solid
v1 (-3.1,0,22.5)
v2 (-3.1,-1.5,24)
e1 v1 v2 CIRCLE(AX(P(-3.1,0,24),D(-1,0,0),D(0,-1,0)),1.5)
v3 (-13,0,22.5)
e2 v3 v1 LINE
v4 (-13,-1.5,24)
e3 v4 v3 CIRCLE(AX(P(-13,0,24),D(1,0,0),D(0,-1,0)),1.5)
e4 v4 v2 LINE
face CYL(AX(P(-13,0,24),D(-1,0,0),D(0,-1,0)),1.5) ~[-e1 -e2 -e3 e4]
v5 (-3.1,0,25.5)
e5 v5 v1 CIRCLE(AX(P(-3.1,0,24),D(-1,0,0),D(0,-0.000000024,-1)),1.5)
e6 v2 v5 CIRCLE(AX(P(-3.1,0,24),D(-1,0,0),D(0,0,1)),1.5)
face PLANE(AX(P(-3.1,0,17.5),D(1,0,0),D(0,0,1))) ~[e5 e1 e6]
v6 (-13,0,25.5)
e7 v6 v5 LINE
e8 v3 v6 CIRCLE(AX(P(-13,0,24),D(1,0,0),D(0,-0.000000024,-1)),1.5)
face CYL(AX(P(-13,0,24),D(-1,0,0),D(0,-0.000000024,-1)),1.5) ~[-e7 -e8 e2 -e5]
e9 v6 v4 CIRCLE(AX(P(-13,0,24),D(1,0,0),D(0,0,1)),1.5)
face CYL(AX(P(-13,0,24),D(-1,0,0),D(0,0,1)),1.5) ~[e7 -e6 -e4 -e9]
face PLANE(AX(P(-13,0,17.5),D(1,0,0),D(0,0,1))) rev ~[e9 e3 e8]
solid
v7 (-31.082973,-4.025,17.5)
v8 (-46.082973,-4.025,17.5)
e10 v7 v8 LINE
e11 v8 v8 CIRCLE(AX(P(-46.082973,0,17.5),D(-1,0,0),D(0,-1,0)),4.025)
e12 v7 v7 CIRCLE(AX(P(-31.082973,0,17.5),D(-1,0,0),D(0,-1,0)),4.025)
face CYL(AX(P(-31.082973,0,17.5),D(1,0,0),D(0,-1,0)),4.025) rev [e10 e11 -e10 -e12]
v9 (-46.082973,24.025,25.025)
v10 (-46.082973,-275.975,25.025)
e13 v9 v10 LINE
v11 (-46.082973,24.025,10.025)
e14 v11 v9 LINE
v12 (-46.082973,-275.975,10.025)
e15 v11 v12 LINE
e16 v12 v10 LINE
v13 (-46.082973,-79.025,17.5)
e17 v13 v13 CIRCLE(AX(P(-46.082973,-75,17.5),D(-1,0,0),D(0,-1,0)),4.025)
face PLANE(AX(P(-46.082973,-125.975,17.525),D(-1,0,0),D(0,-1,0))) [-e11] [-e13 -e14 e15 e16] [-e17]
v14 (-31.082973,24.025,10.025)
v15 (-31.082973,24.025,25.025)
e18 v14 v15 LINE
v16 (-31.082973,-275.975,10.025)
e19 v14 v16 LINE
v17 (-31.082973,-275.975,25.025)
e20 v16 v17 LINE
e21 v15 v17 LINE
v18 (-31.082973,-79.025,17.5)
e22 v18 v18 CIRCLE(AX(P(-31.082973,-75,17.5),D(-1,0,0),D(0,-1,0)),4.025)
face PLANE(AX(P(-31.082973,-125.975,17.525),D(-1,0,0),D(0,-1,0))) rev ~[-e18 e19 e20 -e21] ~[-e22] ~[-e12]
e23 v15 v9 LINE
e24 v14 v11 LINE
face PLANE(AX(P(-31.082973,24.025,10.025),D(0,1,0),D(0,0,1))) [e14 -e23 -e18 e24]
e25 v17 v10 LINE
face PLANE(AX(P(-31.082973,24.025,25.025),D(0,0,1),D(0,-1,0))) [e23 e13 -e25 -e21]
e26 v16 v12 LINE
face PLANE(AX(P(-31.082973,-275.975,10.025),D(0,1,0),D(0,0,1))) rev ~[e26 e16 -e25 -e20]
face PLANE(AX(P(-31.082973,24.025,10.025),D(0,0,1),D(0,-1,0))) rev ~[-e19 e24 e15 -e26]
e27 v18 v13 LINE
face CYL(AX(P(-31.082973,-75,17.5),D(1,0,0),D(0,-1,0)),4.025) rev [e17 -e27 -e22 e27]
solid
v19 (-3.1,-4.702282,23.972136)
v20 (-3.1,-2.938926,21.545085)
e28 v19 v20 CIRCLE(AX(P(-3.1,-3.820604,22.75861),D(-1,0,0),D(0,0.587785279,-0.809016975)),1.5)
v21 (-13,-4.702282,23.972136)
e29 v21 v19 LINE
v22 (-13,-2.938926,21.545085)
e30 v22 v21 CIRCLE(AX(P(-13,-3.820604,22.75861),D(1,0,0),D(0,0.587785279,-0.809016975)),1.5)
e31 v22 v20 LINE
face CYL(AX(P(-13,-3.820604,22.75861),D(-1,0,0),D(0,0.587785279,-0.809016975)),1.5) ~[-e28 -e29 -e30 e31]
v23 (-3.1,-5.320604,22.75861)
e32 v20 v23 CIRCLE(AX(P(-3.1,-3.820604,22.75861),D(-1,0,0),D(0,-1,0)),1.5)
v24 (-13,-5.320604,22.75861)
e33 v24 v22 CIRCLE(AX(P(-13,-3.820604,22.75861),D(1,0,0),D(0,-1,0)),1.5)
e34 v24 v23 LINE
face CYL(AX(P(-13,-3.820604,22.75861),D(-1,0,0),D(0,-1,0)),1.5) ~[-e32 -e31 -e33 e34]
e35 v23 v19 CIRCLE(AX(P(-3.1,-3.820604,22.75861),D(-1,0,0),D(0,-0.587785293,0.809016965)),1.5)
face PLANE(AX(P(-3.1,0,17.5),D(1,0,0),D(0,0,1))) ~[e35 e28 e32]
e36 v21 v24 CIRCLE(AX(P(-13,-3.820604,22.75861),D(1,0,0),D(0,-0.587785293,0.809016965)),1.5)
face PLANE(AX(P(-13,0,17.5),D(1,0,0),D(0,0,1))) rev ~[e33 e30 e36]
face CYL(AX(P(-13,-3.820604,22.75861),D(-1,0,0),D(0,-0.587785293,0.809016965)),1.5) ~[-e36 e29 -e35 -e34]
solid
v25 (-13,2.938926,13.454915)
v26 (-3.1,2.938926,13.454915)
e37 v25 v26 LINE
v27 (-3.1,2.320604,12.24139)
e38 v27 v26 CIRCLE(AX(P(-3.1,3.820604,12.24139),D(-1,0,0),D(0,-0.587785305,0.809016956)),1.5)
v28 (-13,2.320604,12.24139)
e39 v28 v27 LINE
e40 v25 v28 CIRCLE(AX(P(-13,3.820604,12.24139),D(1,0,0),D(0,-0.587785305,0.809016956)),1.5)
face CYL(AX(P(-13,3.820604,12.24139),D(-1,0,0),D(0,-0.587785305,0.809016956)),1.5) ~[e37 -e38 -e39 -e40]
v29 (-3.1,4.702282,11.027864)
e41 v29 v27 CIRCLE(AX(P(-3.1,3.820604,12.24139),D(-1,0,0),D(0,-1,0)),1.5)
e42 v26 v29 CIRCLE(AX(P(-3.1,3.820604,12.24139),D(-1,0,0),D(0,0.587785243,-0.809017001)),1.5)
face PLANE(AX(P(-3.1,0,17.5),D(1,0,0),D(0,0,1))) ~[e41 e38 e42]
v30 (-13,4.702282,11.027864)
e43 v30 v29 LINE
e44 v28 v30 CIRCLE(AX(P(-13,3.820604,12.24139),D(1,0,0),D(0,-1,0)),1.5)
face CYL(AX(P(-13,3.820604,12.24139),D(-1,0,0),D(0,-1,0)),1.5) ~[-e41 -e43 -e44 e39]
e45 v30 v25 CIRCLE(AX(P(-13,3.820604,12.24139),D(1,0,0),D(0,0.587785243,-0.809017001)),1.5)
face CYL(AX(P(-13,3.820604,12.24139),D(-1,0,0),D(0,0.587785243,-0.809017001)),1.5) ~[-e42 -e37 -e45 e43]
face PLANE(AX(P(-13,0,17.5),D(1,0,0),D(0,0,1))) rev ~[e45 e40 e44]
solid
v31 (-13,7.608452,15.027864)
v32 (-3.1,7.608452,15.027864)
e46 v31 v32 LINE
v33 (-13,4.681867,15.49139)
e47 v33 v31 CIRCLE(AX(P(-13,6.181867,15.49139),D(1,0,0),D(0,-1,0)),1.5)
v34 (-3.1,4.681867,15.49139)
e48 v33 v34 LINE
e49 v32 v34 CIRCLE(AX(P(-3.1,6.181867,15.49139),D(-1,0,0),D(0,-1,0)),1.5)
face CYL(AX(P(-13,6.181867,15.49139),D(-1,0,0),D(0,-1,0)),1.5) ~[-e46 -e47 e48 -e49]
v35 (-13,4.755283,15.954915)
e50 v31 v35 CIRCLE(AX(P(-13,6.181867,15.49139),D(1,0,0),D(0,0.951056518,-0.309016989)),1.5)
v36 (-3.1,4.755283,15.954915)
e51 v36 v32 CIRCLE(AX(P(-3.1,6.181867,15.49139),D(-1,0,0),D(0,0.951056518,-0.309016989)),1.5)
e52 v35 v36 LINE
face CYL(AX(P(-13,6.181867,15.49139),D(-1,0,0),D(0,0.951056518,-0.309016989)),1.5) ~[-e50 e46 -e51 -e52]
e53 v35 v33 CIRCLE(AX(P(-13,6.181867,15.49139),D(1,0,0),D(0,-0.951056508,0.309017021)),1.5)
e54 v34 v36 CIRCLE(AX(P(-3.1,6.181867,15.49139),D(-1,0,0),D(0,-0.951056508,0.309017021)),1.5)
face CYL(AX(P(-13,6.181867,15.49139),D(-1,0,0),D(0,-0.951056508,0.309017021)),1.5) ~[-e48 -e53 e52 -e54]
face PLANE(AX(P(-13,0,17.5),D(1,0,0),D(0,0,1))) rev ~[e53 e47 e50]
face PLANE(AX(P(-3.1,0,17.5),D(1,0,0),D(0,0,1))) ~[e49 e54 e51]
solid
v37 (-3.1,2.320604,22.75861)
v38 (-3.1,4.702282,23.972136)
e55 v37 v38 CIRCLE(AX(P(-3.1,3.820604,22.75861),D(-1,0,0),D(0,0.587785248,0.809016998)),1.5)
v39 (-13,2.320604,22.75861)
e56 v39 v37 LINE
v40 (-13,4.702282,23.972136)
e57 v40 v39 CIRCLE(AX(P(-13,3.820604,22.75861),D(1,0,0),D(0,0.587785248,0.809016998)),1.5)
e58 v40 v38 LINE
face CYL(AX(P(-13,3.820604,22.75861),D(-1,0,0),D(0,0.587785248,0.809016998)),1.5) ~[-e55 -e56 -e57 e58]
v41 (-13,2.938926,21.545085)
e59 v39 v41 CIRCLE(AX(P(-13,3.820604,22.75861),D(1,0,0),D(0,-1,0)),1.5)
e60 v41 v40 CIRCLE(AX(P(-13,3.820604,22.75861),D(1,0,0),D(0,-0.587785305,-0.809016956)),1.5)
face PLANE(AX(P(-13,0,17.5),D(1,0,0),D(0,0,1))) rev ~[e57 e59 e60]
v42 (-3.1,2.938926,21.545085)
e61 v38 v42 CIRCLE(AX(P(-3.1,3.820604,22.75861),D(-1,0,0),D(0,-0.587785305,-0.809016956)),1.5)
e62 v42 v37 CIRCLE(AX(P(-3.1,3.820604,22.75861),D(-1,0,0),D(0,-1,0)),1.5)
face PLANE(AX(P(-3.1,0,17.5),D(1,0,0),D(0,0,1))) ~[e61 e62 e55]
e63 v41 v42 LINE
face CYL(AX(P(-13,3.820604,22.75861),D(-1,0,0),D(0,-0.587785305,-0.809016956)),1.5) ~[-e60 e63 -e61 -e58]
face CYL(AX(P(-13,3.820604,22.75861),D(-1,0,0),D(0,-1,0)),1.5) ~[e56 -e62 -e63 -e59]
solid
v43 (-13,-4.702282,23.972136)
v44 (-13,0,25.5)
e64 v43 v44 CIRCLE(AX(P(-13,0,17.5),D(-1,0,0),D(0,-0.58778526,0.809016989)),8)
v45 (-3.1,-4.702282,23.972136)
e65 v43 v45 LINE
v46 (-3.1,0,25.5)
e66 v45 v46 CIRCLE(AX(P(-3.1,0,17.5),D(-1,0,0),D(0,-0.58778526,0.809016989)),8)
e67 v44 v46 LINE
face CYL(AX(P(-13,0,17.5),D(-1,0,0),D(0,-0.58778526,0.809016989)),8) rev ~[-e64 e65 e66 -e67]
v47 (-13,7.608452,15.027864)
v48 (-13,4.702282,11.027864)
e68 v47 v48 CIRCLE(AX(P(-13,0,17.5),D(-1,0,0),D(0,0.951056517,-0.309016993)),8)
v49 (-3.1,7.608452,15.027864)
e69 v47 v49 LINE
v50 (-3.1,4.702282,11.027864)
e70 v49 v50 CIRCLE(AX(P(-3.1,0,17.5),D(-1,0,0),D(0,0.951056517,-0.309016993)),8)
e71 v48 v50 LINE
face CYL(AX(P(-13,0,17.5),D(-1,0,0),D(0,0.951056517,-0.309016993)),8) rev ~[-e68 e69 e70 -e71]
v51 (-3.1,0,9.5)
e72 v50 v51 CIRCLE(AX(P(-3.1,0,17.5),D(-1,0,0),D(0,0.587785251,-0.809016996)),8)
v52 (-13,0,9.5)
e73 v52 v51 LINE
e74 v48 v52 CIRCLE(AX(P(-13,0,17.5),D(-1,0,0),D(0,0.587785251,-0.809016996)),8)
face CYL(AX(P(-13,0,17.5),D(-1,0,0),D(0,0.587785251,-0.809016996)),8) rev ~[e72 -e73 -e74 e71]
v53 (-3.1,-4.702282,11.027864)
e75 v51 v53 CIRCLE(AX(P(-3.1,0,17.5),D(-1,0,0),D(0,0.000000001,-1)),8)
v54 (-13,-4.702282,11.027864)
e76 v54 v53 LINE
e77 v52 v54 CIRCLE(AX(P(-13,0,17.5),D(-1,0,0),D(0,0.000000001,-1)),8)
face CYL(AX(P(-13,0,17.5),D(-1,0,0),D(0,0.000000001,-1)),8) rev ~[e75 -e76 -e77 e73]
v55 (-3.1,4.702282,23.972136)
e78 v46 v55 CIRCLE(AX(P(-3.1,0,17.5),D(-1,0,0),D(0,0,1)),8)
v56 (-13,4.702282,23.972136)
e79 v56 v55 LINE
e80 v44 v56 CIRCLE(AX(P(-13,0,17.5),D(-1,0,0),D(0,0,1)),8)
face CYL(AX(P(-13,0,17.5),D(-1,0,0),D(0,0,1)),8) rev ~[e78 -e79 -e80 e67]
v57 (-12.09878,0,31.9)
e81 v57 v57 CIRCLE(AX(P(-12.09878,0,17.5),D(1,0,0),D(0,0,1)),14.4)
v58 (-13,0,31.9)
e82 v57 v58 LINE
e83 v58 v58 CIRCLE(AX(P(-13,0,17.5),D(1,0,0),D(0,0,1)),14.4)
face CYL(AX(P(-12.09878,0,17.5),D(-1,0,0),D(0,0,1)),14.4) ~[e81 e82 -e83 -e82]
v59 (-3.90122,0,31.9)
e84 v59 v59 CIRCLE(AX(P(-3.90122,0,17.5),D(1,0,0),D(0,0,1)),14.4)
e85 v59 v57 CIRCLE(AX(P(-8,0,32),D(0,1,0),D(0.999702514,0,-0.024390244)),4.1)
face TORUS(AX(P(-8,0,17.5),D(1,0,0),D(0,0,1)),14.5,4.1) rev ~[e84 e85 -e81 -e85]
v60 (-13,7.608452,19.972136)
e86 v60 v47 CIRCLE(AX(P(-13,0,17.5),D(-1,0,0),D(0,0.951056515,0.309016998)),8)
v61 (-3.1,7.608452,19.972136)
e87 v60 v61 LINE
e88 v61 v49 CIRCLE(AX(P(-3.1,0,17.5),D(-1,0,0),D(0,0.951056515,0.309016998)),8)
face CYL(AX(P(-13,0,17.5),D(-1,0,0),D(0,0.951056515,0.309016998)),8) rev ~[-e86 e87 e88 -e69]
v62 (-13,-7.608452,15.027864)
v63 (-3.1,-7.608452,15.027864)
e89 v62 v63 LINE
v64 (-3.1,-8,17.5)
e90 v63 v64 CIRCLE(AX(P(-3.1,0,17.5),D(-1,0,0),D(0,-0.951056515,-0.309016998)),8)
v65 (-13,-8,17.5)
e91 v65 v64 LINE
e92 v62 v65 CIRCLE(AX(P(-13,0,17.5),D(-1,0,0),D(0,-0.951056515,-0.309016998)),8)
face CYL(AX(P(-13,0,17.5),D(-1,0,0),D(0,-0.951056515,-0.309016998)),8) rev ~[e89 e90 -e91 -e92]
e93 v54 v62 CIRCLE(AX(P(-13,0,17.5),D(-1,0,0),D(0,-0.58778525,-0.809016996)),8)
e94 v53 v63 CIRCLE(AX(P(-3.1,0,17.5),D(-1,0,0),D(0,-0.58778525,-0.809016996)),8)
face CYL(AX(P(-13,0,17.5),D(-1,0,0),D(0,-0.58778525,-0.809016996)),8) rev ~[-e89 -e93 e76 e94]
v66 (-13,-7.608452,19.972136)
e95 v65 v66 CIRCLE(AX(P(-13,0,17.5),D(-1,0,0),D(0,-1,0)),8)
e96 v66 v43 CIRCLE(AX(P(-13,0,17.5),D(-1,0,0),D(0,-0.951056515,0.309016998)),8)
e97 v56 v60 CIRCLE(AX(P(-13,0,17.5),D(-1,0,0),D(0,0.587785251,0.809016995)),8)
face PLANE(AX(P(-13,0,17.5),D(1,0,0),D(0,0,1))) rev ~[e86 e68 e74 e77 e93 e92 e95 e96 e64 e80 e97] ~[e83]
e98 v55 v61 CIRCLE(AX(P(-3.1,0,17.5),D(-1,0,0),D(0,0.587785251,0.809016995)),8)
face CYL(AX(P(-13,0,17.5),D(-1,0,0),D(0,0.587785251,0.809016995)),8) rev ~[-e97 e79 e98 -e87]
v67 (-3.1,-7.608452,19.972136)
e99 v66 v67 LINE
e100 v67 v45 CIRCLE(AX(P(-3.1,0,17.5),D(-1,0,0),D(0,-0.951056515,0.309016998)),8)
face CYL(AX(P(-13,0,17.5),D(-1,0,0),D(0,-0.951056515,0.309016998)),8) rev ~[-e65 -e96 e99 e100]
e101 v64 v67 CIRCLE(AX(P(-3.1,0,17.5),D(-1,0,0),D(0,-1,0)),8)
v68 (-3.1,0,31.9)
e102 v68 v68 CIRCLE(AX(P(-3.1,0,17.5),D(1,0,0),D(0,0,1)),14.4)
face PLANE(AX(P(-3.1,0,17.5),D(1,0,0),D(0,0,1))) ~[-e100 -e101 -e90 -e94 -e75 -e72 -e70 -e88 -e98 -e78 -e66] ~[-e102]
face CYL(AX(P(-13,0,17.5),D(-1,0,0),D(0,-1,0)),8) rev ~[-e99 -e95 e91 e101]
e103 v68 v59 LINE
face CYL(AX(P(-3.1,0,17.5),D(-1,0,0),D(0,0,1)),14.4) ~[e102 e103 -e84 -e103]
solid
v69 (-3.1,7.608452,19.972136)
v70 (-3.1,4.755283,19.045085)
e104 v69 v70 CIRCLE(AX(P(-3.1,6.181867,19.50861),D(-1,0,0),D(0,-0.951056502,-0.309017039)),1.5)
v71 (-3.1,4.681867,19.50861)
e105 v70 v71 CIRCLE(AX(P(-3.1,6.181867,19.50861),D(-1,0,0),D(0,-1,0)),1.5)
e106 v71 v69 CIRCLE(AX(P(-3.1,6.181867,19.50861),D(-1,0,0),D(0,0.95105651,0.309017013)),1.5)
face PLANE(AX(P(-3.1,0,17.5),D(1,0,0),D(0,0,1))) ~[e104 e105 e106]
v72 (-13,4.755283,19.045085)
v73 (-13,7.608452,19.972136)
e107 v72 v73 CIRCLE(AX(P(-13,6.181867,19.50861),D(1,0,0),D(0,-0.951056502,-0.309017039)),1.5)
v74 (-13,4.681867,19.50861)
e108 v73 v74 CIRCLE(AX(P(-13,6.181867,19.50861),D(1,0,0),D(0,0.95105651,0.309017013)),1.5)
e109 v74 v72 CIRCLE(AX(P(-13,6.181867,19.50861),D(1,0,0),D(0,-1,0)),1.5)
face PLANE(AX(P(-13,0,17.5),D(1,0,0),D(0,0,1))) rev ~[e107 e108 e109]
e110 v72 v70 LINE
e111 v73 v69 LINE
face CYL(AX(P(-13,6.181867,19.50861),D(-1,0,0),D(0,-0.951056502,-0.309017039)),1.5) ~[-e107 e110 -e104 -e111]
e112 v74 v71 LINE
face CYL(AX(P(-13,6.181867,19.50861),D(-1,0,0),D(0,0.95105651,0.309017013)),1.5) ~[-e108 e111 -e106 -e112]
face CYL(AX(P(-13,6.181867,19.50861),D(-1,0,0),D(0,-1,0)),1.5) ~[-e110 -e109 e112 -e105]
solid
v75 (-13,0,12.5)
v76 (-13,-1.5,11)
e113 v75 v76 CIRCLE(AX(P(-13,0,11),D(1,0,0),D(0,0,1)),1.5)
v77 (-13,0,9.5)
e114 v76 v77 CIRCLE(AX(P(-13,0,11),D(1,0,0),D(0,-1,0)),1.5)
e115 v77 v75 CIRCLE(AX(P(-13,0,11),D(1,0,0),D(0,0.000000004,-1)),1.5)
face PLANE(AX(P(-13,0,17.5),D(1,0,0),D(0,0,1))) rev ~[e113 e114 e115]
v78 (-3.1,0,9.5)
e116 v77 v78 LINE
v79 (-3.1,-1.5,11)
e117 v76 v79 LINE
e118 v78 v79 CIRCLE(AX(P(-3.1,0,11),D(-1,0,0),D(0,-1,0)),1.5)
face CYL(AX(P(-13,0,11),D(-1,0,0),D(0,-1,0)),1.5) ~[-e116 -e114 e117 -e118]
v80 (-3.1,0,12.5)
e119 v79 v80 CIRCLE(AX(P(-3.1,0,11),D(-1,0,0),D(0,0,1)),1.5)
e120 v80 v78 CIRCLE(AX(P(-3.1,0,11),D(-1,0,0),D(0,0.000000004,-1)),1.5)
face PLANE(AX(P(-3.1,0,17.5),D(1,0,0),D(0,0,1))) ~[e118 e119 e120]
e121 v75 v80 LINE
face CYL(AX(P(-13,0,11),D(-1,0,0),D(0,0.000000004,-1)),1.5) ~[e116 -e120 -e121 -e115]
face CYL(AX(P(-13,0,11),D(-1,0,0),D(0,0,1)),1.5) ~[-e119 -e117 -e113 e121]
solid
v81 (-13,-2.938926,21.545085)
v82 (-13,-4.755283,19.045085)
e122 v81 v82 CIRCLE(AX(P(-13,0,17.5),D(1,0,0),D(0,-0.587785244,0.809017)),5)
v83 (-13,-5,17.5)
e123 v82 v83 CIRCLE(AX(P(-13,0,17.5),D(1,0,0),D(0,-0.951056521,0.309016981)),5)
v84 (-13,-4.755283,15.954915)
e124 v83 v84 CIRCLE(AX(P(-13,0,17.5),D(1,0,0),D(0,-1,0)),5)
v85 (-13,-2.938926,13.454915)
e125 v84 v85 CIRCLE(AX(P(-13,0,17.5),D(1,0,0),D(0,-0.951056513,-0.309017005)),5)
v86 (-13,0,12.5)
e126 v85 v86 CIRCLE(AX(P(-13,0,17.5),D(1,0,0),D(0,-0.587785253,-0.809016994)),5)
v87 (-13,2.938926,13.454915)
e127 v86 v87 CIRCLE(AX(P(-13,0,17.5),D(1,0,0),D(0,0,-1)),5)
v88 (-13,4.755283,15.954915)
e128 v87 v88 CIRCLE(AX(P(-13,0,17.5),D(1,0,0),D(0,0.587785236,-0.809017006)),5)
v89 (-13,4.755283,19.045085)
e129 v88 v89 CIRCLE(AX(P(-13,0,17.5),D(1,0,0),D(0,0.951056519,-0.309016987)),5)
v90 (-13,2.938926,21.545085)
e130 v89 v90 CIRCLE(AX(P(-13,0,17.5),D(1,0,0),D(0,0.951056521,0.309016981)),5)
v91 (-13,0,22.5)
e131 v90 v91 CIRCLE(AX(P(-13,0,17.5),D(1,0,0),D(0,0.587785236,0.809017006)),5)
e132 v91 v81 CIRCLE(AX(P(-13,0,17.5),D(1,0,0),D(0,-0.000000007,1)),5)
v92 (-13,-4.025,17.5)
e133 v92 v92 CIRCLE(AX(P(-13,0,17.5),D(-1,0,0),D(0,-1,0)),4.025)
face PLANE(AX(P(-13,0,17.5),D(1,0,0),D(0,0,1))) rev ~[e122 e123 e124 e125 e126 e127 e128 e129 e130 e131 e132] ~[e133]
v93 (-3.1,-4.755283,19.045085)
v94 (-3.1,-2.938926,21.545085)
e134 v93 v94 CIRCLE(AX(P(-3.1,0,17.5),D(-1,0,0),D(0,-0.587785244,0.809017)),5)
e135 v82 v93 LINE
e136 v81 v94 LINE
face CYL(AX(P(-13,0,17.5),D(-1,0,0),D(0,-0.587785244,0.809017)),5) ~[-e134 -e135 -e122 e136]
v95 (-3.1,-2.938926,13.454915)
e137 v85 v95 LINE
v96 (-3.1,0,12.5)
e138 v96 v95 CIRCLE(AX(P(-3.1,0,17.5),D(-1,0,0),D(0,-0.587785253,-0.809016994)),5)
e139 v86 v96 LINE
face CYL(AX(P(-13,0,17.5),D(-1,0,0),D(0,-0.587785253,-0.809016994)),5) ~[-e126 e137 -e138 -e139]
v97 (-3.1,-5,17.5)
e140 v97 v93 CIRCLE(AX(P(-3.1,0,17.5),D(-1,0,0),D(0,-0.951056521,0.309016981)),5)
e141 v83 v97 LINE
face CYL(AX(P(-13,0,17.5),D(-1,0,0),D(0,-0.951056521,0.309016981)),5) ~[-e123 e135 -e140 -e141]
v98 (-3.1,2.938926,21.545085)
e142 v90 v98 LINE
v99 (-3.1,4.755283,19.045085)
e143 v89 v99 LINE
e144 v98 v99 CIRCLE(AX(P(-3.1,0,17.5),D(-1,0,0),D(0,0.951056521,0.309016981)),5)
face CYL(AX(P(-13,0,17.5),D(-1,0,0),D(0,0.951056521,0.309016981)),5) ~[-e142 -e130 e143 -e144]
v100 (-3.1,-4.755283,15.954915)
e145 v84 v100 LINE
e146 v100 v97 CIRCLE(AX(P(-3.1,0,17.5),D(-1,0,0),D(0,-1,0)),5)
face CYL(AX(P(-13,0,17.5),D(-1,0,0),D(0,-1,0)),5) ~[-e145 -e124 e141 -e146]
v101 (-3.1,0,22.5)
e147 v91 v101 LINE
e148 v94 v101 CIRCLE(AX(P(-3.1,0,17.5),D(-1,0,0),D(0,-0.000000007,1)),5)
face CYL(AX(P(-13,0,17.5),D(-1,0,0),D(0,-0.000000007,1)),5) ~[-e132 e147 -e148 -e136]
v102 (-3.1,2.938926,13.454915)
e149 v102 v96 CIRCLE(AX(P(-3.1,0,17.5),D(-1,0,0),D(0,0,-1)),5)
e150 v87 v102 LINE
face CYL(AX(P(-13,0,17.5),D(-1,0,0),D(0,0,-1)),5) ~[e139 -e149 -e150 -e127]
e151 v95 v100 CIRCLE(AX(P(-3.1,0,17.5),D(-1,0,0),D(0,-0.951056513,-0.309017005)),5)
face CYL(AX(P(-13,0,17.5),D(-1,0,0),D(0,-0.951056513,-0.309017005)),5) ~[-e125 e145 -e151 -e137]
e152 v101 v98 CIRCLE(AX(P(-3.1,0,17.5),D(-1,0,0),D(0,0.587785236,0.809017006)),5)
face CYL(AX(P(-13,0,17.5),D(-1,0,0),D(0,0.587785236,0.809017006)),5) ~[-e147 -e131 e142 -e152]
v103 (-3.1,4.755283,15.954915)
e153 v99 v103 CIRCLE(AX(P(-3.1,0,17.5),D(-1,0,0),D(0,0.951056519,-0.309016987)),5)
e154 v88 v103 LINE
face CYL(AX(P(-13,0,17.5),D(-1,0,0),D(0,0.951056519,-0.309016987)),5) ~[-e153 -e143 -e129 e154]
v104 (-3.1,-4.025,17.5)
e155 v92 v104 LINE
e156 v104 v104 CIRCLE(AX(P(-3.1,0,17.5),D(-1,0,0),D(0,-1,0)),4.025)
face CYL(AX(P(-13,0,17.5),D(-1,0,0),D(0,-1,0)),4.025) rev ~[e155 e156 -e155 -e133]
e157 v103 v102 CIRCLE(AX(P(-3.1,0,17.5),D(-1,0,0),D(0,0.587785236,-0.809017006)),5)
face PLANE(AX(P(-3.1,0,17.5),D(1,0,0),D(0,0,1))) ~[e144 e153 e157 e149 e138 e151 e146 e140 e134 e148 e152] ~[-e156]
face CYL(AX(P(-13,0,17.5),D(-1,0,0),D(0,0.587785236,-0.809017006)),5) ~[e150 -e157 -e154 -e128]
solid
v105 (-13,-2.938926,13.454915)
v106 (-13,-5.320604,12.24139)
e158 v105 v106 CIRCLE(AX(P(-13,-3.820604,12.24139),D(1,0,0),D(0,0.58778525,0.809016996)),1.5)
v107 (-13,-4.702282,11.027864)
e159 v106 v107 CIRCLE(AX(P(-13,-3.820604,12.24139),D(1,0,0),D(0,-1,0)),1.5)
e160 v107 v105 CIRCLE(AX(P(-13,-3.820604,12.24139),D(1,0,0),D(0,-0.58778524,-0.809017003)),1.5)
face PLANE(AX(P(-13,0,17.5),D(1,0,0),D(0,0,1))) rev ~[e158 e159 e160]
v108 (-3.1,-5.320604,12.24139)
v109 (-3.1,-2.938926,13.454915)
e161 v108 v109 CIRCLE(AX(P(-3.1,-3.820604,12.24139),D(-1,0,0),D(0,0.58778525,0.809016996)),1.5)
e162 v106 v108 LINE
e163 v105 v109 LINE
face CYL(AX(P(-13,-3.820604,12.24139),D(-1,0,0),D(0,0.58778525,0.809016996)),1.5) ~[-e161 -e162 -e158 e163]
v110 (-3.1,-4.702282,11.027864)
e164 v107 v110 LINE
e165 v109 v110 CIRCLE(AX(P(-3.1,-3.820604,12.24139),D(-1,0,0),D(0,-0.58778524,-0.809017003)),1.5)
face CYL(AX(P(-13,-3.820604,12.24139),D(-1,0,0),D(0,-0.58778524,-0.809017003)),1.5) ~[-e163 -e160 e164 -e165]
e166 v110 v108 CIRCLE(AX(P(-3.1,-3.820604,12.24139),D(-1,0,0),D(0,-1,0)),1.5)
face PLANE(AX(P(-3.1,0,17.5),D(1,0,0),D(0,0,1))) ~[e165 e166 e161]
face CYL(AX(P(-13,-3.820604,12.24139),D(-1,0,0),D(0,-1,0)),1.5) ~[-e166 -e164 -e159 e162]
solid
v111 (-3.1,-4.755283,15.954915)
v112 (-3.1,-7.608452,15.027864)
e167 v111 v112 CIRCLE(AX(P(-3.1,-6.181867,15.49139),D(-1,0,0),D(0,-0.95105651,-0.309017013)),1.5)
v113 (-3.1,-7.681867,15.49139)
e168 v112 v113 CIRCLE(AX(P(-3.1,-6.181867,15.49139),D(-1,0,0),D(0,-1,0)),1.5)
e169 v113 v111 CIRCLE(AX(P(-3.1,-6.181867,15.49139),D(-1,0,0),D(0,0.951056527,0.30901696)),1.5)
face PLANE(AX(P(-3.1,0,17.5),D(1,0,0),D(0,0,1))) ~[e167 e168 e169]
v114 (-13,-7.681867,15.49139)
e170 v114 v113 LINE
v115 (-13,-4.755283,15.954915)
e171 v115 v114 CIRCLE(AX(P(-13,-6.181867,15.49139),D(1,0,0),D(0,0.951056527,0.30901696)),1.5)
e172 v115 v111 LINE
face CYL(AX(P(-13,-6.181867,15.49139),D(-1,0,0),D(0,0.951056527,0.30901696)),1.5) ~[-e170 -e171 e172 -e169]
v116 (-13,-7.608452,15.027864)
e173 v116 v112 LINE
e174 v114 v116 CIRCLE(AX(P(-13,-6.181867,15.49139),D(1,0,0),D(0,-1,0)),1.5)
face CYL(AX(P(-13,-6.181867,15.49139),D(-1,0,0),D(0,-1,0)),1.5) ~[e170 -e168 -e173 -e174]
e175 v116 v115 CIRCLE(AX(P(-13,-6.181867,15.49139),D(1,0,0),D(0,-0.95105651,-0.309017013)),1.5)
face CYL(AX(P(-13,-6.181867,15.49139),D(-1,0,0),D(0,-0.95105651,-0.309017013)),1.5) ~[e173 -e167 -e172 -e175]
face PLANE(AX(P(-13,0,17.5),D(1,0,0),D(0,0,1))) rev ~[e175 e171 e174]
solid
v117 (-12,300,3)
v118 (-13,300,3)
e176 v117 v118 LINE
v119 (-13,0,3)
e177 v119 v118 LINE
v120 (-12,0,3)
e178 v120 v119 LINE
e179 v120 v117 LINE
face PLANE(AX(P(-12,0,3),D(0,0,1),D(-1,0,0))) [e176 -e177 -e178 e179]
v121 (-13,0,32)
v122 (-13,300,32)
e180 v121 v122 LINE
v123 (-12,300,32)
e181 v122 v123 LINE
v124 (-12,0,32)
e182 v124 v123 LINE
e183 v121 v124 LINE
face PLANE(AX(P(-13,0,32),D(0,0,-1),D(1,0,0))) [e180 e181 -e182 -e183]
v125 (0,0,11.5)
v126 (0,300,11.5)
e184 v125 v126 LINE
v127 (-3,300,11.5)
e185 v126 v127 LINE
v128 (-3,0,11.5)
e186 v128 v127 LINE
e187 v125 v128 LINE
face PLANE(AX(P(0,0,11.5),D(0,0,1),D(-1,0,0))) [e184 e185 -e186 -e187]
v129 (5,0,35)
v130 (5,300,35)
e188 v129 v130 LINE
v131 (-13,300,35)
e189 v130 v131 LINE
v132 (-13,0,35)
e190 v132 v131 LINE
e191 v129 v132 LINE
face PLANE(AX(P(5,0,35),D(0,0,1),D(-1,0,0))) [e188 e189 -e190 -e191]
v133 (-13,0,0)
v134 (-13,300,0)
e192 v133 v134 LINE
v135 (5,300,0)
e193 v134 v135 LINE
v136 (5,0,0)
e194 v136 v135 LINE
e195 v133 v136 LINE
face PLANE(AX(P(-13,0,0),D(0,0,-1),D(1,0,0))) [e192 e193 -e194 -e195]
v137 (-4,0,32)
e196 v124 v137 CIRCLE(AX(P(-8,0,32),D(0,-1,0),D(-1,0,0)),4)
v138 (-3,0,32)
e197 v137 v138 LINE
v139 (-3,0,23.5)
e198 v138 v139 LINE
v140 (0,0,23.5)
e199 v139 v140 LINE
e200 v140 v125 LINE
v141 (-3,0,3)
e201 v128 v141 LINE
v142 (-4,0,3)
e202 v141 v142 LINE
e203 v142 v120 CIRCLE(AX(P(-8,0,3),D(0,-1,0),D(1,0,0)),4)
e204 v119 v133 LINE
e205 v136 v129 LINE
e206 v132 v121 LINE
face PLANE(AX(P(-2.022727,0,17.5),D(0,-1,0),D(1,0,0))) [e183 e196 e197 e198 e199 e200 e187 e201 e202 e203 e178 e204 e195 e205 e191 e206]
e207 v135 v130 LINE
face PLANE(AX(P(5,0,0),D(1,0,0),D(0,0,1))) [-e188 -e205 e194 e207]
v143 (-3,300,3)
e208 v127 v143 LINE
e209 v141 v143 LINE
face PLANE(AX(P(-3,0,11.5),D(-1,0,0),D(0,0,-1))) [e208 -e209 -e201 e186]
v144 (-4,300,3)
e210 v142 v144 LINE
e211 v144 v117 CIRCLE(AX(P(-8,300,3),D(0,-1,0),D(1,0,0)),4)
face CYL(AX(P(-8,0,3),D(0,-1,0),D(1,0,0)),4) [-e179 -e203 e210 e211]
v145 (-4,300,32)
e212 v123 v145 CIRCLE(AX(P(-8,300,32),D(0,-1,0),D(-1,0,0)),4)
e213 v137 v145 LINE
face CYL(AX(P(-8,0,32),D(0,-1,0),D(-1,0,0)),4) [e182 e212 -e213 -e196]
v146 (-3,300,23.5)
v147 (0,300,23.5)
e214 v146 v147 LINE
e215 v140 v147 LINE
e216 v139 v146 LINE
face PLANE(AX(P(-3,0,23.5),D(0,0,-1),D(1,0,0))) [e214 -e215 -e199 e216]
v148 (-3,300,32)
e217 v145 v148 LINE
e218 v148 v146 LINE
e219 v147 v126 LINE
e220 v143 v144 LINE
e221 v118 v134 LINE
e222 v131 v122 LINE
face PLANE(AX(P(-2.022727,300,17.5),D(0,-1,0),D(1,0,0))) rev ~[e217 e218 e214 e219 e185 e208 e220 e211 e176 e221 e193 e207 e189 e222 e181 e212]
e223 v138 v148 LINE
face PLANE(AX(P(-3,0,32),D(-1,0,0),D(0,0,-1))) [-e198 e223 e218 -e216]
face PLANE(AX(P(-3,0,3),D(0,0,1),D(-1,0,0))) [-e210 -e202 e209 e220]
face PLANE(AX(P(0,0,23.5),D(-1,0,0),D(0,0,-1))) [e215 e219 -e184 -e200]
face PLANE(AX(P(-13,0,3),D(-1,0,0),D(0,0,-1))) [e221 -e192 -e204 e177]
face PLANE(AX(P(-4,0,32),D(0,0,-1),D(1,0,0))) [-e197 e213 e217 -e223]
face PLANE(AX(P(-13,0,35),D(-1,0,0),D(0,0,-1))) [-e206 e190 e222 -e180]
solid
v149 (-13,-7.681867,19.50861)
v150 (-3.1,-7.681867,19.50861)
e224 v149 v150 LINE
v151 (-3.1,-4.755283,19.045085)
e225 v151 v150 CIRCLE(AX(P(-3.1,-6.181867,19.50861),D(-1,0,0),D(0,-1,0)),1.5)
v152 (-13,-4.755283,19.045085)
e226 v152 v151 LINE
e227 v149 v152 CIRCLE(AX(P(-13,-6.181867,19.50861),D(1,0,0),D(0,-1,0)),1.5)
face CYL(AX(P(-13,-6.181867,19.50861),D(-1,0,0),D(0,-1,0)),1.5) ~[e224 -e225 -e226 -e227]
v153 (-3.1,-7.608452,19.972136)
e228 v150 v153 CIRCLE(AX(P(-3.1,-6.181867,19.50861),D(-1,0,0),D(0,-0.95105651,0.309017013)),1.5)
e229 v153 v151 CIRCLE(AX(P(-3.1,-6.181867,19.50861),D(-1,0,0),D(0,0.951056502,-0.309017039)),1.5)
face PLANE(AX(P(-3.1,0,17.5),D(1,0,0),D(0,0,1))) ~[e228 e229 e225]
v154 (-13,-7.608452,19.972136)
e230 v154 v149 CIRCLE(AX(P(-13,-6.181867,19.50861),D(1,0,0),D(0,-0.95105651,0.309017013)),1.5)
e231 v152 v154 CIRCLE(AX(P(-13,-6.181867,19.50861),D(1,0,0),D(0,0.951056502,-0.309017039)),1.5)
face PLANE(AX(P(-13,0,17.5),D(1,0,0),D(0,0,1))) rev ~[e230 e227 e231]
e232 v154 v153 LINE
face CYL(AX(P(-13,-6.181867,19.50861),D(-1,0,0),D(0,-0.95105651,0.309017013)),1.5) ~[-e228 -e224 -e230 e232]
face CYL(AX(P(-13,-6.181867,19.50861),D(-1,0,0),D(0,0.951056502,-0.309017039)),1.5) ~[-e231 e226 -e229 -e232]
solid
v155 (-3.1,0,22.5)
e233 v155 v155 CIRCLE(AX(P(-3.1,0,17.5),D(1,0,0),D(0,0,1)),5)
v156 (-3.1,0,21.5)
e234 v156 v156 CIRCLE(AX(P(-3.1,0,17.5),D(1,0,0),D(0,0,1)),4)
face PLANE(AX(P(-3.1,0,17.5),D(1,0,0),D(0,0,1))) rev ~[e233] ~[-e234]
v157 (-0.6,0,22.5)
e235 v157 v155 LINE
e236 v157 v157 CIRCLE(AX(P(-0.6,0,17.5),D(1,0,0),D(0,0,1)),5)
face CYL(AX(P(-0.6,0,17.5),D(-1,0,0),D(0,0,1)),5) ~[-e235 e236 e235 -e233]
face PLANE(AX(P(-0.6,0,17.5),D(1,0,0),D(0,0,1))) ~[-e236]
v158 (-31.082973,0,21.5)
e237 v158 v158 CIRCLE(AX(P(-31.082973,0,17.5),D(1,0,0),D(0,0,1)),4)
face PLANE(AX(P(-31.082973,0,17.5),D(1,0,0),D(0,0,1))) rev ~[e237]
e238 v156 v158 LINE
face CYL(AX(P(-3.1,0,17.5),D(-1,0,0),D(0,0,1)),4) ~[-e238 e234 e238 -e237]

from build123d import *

# Parameters (mm, degrees)
F1_DEPTH = 300
F4_R     = 4.025
F5_DEPTH = 18.001
F6_W     = 2.4
F6_H     = 5
F8_W     = 300
F8_H     = 15
F8_R     = 4.025
F9_DEPTH = 15


with BuildPart() as f1:
    # F0 (on Front) → F1 (new body)
    with BuildSketch(Plane.XZ):
        Polygon((5, 35), (0, 35), (-13, 35), (-13, 32), (-12, 32), (-4, 32), (-3, 32), (-3, 23.5), (0, 23.5), (0, 17.5), (0, 11.5), (-3, 11.5), (-3, 3), (-4, 3), (-12, 3), (-13, 3), (-13, 0), (0, 0), (5, 0), align=None)
        with BuildLine():
            Line((-4, 32), (-12, 32))
            ThreePointArc((-12, 32), (-8, 28), (-4, 32))
        make_face()
        with BuildLine():
            ThreePointArc((-4, 3), (-8, 7), (-12, 3))
            Line((-12, 3), (-4, 3))
        make_face()
    extrude(amount=-F1_DEPTH)


with BuildPart() as f3:
    # F2 (on Front) → F3 (revolve)
    with BuildSketch(Plane.XZ):
        with BuildLine():
            ThreePointArc((-3.9012196936, 31.9), (-8, 27.9), (-12.0987803064, 31.9))
            Line((-12.0987803064, 31.9), (-13, 31.9))
            Line((-13, 31.9), (-13, 17.5))
            Line((-13, 17.5), (-3.1, 17.5))
            Line((-3.1, 17.5), (-3.1, 31.9))
            Line((-3.1, 31.9), (-3.9012196936, 31.9))
        make_face()
    revolve(axis=Axis((-8.05, 0, 17.5), (1, 0, 0)))

    # F4 (on face) → F5 (cut, through all)
    with BuildSketch(Plane(origin=(-13, 0, 0), x_dir=(0, -1, 0), z_dir=(-1, 0, 0))):
        with BuildLine():
            ThreePointArc((2.9389262209, 21.5450850013), (2.607078685, 23.6402883924), (4.7022820788, 23.9721359111))
            ThreePointArc((4.7022820788, 23.9721359111), (2.4721359905, 25.1084521188), (0, 25.5))
            ThreePointArc((0, 25.5), (1.0606601718, 25.0606601718), (1.5, 24))
            ThreePointArc((1.5, 24), (1.0606601843, 22.9393398407), (3.53e-08, 22.5))
            ThreePointArc((3.53e-08, 22.5), (1.5450849648, 22.2552825838), (2.9389262209, 21.5450850013))
        make_face()
        with BuildLine():
            ThreePointArc((4.7552826033, 19.0450849048), (5.7183418168, 20.9351952224), (7.6084521213, 19.972135983))
            ThreePointArc((7.6084521213, 19.972135983), (6.4721359683, 22.202282), (4.7022820788, 23.9721359111))
            ThreePointArc((4.7022820788, 23.9721359111), (5.1571139431, 23.4395961798), (5.3206041399, 22.7586104634))
            ThreePointArc((5.3206041399, 22.7586104634), (4.5015898672, 21.4221006658), (2.9389262209, 21.5450850013))
            ThreePointArc((2.9389262209, 21.5450850013), (4.0450849779, 20.4389262532), (4.7552826033, 19.0450849048))
        make_face()
        with BuildLine():
            ThreePointArc((7.6084521213, 15.027864017), (7.9015067225, 16.2485242651), (8, 17.5))
            ThreePointArc((8, 17.5), (7.9015067225, 18.7514757349), (7.6084521213, 19.972135983))
            ThreePointArc((7.6084521213, 19.972135983), (7.6633998645, 19.7432621756), (7.6818673559, 19.5086104634))
            ThreePointArc((7.6818673559, 19.5086104634), (6.4165190883, 18.0270779581), (4.7552826033, 19.0450849048))
            ThreePointArc((4.7552826033, 19.0450849048), (4.9384417085, 18.2821722904), (5, 17.5))
            ThreePointArc((5, 17.5), (4.9384416988, 16.7178276482), (4.7552825648, 15.9549149769))
            ThreePointArc((4.7552825648, 15.9549149769), (6.4165190269, 16.9729220517), (7.6818673559, 15.4913895366))
            ThreePointArc((7.6818673559, 15.4913895366), (7.6633998645, 15.2567378244), (7.6084521213, 15.027864017))
        make_face()
        with BuildLine():
            ThreePointArc((3.53e-08, 22.5), (-1.5, 23.9999999824), (0, 25.5))
            ThreePointArc((0, 25.5), (-2.4721359511, 25.1084521316), (-4.7022820116, 23.9721359599))
            ThreePointArc((-4.7022820116, 23.9721359599), (-3.1396183866, 24.0951202478), (-2.3206041399, 22.7586104634))
            ThreePointArc((-2.3206041399, 22.7586104634), (-2.4840943313, 22.0776247576), (-2.938926182, 21.5450850296))
            ThreePointArc((-2.938926182, 21.5450850296), (-1.5450849084, 22.2552826021), (3.53e-08, 22.5))
        make_face()
        with BuildLine():
            ThreePointArc((-2.938926182, 21.5450850296), (-5.034129605, 21.8769325486), (-4.7022820116, 23.9721359599))
            ThreePointArc((-4.7022820116, 23.9721359599), (-6.4721359439, 22.2022820336), (-7.6084521213, 19.972135983))
            ThreePointArc((-7.6084521213, 19.972135983), (-5.9472156438, 20.990142972), (-4.6818673559, 19.5086104634))
            ThreePointArc((-4.6818673559, 19.5086104634), (-4.7003348505, 19.273958731), (-4.7552826033, 19.0450849048))
            ThreePointArc((-4.7552826033, 19.0450849048), (-4.0450849637, 20.4389262727), (-2.938926182, 21.5450850296))
        make_face()
        with BuildLine():
            ThreePointArc((-4.7552826033, 19.0450849048), (-6.645392895, 18.0820257044), (-7.6084521213, 19.972135983))
            ThreePointArc((-7.6084521213, 19.972135983), (-8, 17.5000000186), (-7.6084521328, 15.0278640524))
            ThreePointArc((-7.6084521328, 15.0278640524), (-6.6453928634, 16.9179743058), (-4.7552825942, 15.9549150673))
            ThreePointArc((-4.7552825942, 15.9549150673), (-5, 17.4999999853), (-4.7552826033, 19.0450849048))
        make_face()
        with BuildLine():
            ThreePointArc((-7.6084521328, 15.0278640524), (-6.4721359523, 12.797717978), (-4.7022820047, 11.0278640351))
            ThreePointArc((-4.7022820047, 11.0278640351), (-5.0341296075, 13.1230674479), (-2.938926182, 13.4549149704))
            ThreePointArc((-2.938926182, 13.4549149704), (-4.0450849551, 14.5610737155), (-4.7552825942, 15.9549150673))
            ThreePointArc((-4.7552825942, 15.9549150673), (-4.7003348482, 15.7260412545), (-4.6818673559, 15.4913895366))
            ThreePointArc((-4.6818673559, 15.4913895366), (-5.9472156622, 14.0098570251), (-7.6084521328, 15.0278640524))
        make_face()
        with BuildLine():
            ThreePointArc((-4.7022820047, 11.0278640351), (-2.4721359497, 9.8915478679), (-5.8e-09, 9.5))
            ThreePointArc((-5.8e-09, 9.5), (-1.5, 11.0000000029), (0, 12.5))
            ThreePointArc((0, 12.5), (-1.5450849252, 12.7447174033), (-2.938926182, 13.4549149704))
            ThreePointArc((-2.938926182, 13.4549149704), (-2.4840943313, 12.9223752424), (-2.3206041399, 12.2413895366))
            ThreePointArc((-2.3206041399, 12.2413895366), (-3.1396183828, 10.9048797541), (-4.7022820047, 11.0278640351))
        make_face()
        with BuildLine():
            ThreePointArc((-5.8e-09, 9.5), (2.4721359416, 9.8915478653), (4.7022820002, 11.0278640318))
            ThreePointArc((4.7022820002, 11.0278640318), (2.6070786407, 11.3597116687), (2.9389262644, 13.4549150303))
            ThreePointArc((2.9389262644, 13.4549150303), (1.5450849736, 12.7447174191), (0, 12.5))
            ThreePointArc((0, 12.5), (1.0606601718, 12.0606601718), (1.5, 11))
            ThreePointArc((1.5, 11), (1.0606601697, 9.9393398262), (-5.8e-09, 9.5))
        make_face()
        with BuildLine():
            ThreePointArc((4.7022820002, 11.0278640318), (6.4721359397, 12.7977179606), (7.6084521213, 15.027864017))
            ThreePointArc((7.6084521213, 15.027864017), (5.7183418759, 14.0648047584), (4.7552825648, 15.9549149769))
            ThreePointArc((4.7552825648, 15.9549149769), (4.0450849571, 14.5610737183), (2.9389262644, 13.4549150303))
            ThreePointArc((2.9389262644, 13.4549150303), (4.5015898911, 13.577899322), (5.3206041399, 12.2413895366))
            ThreePointArc((5.3206041399, 12.2413895366), (5.1571139211, 11.5604037769), (4.7022820002, 11.0278640318))
        make_face()
        with Locations((0, 17.5)):
            Circle(F4_R)
    extrude(amount=-F5_DEPTH, mode=Mode.SUBTRACT)


with BuildPart() as f7:
    # F6 (on Front) → F7 (revolve)
    with BuildSketch(Plane.XZ):
        Polygon((-3.1, 17.5), (-3, 17.5), (-3, 22.5), (-3.1, 22.5), (-3.1, 21.5), (-13, 21.5), (-31.0829728842, 21.5), (-31.0829728842, 17.5), (-13, 17.5), align=None)
        with Locations((-1.8, 20)):
            Rectangle(F6_W, F6_H)
    revolve(axis=Axis((-17.0914864421, 0, 17.5), (1, 0, 0)))


with BuildPart() as f9:
    # F8 (on face) → F9 (new body)
    with BuildSketch(Plane(origin=(-31.0829728842, 0, 0), x_dir=(0, -1, 0), z_dir=(-1, 0, 0))):
        with Locations((125.975, 17.525)):
            Rectangle(F8_W, F8_H)
        with Locations((0, 17.5)):
            Circle(F8_R, mode=Mode.SUBTRACT)
        with Locations((75, 17.5)):
            Circle(F8_R, mode=Mode.SUBTRACT)
    extrude(amount=F9_DEPTH)


solid = Compound([f1.part, f3.part, f7.part, f9.part])
